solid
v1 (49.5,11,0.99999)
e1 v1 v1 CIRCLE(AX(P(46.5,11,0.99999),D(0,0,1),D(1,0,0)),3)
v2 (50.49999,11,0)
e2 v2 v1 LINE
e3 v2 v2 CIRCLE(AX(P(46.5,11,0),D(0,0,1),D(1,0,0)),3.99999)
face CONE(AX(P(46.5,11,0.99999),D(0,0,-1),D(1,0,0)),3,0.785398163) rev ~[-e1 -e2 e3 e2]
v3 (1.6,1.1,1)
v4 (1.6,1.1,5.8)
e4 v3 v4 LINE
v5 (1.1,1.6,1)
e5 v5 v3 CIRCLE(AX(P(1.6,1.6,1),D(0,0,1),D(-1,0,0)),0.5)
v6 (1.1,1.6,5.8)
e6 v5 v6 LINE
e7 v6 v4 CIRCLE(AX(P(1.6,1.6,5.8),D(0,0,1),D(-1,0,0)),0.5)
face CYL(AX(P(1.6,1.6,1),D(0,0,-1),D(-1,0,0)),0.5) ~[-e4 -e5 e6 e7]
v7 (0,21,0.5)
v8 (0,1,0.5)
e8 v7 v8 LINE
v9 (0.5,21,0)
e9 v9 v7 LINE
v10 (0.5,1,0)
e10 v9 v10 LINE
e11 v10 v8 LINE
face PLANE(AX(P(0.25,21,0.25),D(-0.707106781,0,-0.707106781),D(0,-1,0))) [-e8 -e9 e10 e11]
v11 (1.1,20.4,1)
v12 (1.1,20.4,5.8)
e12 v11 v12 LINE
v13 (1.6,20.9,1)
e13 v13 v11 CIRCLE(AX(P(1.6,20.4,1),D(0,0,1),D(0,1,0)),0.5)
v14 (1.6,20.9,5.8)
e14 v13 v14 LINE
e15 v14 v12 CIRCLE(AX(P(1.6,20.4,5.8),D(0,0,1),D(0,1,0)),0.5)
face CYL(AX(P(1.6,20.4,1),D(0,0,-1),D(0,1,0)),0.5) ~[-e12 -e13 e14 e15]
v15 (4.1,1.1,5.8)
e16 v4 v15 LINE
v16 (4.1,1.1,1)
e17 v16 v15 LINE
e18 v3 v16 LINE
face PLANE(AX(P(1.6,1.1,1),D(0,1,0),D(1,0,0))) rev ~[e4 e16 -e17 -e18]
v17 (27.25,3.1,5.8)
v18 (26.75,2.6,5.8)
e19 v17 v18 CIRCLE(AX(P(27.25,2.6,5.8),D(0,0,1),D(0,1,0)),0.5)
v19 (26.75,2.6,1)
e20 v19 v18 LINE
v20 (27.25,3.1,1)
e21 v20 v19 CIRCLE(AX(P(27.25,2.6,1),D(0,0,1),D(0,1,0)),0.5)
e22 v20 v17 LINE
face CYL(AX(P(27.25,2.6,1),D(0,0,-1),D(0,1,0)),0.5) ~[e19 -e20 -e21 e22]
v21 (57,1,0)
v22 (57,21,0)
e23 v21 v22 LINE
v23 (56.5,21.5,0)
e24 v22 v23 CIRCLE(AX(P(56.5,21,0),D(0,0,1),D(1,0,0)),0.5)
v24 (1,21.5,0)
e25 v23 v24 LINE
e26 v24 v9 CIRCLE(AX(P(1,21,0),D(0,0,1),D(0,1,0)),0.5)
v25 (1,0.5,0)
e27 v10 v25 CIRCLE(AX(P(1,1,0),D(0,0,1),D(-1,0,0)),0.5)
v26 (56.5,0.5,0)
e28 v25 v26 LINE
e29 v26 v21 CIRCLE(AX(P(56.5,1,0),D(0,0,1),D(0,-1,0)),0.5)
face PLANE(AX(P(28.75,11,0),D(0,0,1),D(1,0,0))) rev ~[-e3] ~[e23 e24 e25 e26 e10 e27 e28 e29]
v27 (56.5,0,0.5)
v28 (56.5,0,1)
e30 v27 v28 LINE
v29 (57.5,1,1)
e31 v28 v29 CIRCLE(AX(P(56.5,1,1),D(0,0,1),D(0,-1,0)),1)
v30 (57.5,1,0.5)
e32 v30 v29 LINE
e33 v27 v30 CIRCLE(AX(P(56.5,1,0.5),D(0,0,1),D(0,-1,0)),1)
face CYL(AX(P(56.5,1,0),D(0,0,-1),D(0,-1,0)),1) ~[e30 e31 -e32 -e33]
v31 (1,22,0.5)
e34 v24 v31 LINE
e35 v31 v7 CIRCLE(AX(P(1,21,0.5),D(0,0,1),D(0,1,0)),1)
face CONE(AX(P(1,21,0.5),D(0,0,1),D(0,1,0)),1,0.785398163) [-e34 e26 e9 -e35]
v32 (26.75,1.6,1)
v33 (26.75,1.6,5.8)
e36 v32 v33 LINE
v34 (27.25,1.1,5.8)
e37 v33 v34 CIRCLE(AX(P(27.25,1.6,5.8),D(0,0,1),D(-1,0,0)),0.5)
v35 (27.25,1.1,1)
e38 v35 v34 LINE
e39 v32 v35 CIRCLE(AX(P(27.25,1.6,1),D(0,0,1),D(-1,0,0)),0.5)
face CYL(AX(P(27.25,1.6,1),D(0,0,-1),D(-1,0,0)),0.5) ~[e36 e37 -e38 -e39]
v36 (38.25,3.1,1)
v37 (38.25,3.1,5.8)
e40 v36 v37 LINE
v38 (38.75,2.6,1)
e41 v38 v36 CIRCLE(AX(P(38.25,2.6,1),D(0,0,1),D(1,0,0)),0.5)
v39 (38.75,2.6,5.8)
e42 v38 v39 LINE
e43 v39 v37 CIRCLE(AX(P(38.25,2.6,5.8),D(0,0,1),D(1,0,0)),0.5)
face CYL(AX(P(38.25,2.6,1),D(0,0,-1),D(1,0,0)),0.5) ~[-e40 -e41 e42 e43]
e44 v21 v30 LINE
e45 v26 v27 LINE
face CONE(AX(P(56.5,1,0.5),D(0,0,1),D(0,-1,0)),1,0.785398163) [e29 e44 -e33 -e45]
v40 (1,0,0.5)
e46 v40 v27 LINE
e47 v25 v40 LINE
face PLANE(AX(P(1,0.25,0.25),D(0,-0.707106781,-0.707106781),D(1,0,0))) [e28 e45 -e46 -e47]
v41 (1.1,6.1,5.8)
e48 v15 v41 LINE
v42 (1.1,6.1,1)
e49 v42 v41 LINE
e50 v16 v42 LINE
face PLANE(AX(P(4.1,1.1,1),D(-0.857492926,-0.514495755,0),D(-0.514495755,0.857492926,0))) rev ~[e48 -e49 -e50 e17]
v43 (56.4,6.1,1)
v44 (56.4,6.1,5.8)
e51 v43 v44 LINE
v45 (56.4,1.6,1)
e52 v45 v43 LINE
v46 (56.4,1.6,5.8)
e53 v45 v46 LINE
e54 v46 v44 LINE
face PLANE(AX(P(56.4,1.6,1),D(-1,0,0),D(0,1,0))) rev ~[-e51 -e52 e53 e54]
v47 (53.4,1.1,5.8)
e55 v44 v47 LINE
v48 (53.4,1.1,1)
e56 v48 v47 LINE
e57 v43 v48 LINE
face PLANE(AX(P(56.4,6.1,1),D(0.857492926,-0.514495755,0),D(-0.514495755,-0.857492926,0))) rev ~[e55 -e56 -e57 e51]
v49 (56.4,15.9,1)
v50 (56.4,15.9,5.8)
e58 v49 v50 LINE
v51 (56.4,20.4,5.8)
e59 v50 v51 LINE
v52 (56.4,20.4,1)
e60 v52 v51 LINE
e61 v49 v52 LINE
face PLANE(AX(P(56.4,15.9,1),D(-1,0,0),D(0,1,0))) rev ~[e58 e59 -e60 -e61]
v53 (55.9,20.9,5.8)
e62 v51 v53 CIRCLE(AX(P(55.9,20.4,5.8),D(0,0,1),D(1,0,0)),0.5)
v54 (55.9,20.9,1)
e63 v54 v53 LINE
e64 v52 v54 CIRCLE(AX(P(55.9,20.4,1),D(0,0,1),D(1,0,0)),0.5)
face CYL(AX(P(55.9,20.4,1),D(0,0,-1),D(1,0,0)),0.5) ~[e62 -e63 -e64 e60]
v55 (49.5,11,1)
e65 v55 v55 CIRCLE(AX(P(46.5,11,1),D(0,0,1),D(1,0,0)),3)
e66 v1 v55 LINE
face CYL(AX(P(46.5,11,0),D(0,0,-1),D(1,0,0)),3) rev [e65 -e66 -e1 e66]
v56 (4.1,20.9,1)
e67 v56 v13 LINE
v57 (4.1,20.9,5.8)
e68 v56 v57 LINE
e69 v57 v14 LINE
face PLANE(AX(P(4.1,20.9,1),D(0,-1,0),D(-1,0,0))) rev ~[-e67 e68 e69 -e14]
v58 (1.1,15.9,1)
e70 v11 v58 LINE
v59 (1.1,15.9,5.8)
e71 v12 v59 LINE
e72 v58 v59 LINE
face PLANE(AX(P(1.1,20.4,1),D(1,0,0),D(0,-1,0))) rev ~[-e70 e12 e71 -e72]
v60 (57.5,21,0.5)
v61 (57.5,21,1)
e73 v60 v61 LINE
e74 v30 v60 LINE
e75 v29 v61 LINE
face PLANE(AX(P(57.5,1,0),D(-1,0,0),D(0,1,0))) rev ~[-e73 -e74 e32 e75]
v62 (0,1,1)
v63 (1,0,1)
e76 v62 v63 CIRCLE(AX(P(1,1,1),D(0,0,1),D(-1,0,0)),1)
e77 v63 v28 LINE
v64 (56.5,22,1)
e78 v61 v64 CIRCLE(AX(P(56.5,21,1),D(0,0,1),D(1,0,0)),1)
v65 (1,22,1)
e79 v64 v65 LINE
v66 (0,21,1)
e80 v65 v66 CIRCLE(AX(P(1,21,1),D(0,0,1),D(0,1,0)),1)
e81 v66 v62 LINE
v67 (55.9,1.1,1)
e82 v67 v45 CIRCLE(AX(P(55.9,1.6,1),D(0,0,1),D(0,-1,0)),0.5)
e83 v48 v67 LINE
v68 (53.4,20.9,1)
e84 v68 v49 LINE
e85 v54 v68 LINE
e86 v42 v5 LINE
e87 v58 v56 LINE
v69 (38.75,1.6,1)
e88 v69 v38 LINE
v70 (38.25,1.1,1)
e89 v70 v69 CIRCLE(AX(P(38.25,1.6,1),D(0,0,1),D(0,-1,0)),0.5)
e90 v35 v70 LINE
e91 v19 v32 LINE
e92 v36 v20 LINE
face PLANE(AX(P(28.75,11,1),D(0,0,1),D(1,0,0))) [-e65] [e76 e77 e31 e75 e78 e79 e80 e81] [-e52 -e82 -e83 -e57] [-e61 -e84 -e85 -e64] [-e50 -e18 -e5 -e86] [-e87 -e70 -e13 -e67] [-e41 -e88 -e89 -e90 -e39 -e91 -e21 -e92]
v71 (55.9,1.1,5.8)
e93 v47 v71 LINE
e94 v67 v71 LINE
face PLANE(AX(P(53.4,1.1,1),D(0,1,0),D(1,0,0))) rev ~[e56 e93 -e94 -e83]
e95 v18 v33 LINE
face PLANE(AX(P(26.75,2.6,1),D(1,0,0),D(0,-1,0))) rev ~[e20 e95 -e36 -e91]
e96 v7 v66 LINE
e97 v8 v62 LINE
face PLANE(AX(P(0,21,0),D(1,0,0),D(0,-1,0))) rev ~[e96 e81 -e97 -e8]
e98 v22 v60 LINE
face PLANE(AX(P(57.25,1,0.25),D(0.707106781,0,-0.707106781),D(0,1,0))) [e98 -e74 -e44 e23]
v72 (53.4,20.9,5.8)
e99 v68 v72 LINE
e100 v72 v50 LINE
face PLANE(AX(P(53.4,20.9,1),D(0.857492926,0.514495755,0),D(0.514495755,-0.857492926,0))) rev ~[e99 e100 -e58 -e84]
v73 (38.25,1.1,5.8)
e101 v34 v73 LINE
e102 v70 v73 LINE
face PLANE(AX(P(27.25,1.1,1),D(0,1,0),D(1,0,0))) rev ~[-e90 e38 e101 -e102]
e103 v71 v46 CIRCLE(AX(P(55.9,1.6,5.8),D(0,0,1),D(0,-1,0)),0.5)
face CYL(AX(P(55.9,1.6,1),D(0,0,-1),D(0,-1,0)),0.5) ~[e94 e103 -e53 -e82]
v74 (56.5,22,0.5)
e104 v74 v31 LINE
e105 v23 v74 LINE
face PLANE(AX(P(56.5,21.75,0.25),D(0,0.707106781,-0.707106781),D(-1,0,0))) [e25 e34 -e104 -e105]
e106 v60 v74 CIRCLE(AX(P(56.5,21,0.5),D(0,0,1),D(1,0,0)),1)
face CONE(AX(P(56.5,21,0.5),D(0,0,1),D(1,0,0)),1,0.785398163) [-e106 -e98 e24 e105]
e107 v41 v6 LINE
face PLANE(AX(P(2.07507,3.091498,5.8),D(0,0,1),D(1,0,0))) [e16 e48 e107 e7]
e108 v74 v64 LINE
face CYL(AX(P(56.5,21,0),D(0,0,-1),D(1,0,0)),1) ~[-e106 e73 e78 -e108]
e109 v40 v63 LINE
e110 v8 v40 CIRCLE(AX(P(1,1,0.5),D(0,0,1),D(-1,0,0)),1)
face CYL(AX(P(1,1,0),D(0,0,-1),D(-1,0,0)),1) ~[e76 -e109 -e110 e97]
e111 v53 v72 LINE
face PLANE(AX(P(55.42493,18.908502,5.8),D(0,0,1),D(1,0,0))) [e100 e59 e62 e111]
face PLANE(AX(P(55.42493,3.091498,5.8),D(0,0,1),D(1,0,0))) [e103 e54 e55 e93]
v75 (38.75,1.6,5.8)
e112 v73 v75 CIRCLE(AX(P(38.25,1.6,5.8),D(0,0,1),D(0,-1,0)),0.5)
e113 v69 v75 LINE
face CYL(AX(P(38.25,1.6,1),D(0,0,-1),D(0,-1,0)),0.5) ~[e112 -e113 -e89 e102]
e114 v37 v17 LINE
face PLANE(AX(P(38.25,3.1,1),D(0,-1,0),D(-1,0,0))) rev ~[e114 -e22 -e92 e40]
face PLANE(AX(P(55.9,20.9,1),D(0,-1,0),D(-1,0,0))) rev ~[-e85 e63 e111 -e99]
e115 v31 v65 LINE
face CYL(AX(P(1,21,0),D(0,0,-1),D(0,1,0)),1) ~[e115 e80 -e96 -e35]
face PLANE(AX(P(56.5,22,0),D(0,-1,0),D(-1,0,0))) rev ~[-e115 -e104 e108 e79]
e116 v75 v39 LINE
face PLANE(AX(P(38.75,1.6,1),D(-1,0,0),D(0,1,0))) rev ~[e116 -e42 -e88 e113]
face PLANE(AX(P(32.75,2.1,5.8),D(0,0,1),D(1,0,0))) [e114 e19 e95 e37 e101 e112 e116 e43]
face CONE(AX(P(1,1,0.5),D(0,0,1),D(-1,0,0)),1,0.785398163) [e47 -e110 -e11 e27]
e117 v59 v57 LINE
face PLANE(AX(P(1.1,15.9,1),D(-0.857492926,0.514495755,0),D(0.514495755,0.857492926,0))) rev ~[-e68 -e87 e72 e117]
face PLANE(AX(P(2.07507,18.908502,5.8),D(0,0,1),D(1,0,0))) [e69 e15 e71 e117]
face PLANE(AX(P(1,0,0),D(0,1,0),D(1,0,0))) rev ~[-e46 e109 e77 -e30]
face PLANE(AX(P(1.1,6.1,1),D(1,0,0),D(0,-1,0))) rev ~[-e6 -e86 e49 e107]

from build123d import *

# Parameters (mm, degrees)
F0_R     = 3
F1_DEPTH = 1
F3_DEPTH = 4.8
F4_SIZE  = 0.99999
F5_SIZE  = 0.5


# Not quite as in the source:
# - a fillet or chamfer is up to 0.001 mm smaller than in the source, because OpenCascade refuses the exact size


with BuildPart() as f1:
    # F0 (on Top) → F1 (new body)
    with BuildSketch(Plane.XY):
        with BuildLine():
            Line((56.5, 22), (1, 22))
            ThreePointArc((1, 22), (0.2928932188, 21.7071067812), (0, 21))
            Line((0, 21), (0, 1))
            ThreePointArc((0, 1), (0.2928932188, 0.2928932188), (1, 0))
            Line((1, 0), (56.5, 0))
            ThreePointArc((56.5, 0), (57.2071067812, 0.2928932188), (57.5, 1))
            Line((57.5, 1), (57.5, 21))
            ThreePointArc((57.5, 21), (57.2071067812, 21.7071067812), (56.5, 22))
        make_face()
        with Locations((46.5, 11)):
            Circle(F0_R, mode=Mode.SUBTRACT)
    extrude(amount=F1_DEPTH)

    # F2 (on face) → F3 (join)
    with BuildSketch(Plane.XY.offset(1)):
        with BuildLine():
            Line((1.1, 20.4), (1.1, 15.9))
            Line((1.1, 15.9), (4.1, 20.9))
            Line((4.1, 20.9), (1.6, 20.9))
            ThreePointArc((1.6, 20.9), (1.2464466094, 20.7535533906), (1.1, 20.4))
        make_face()
        with BuildLine():
            ThreePointArc((56.4, 20.4), (56.2535533906, 20.7535533906), (55.9, 20.9))
            Line((55.9, 20.9), (53.4, 20.9))
            Line((53.4, 20.9), (56.4, 15.9))
            Line((56.4, 15.9), (56.4, 20.4))
        make_face()
        with BuildLine():
            ThreePointArc((1.1, 1.6), (1.2464466094, 1.2464466094), (1.6, 1.1))
            Line((1.6, 1.1), (4.1, 1.1))
            Line((4.1, 1.1), (1.1, 6.1))
            Line((1.1, 6.1), (1.1, 1.6))
        make_face()
        with BuildLine():
            Line((53.4, 1.1), (55.9, 1.1))
            ThreePointArc((55.9, 1.1), (56.2535533906, 1.2464466094), (56.4, 1.6))
            Line((56.4, 1.6), (56.4, 6.1))
            Line((56.4, 6.1), (53.4, 1.1))
        make_face()
        with BuildLine():
            Line((38.25, 3.1), (27.25, 3.1))
            ThreePointArc((27.25, 3.1), (26.8964466094, 2.9535533906), (26.75, 2.6))
            Line((26.75, 2.6), (26.75, 1.6))
            ThreePointArc((26.75, 1.6), (26.8964466094, 1.2464466094), (27.25, 1.1))
            Line((27.25, 1.1), (38.25, 1.1))
            ThreePointArc((38.25, 1.1), (38.6035533906, 1.2464466094), (38.75, 1.6))
            Line((38.75, 1.6), (38.75, 2.6))
            ThreePointArc((38.75, 2.6), (38.6035533906, 2.9535533906), (38.25, 3.1))
        make_face()
    extrude(amount=F3_DEPTH)

    # F4 (size 1 in the source; OpenCascade refuses exactly that, so slightly less here)
    f4_edges = [f1.edges().sort_by_distance(p)[0] for p in [
        (43.5, 11, 0),
    ]]
    chamfer(f4_edges, length=F4_SIZE)

    # F5
    f5_edges = [f1.edges().sort_by_distance(p)[0] for p in [
        (28.75, 0, 0),
        (0, 11, 0),
        (0.292893, 0.292893, 0),
        (0.292893, 21.707107, 0),
        (28.75, 22, 0),
        (57.5, 11, 0),
        (57.207107, 0.292893, 0),
        (57.207107, 21.707107, 0),
    ]]
    chamfer(f5_edges, length=F5_SIZE)


solid = f1.part
